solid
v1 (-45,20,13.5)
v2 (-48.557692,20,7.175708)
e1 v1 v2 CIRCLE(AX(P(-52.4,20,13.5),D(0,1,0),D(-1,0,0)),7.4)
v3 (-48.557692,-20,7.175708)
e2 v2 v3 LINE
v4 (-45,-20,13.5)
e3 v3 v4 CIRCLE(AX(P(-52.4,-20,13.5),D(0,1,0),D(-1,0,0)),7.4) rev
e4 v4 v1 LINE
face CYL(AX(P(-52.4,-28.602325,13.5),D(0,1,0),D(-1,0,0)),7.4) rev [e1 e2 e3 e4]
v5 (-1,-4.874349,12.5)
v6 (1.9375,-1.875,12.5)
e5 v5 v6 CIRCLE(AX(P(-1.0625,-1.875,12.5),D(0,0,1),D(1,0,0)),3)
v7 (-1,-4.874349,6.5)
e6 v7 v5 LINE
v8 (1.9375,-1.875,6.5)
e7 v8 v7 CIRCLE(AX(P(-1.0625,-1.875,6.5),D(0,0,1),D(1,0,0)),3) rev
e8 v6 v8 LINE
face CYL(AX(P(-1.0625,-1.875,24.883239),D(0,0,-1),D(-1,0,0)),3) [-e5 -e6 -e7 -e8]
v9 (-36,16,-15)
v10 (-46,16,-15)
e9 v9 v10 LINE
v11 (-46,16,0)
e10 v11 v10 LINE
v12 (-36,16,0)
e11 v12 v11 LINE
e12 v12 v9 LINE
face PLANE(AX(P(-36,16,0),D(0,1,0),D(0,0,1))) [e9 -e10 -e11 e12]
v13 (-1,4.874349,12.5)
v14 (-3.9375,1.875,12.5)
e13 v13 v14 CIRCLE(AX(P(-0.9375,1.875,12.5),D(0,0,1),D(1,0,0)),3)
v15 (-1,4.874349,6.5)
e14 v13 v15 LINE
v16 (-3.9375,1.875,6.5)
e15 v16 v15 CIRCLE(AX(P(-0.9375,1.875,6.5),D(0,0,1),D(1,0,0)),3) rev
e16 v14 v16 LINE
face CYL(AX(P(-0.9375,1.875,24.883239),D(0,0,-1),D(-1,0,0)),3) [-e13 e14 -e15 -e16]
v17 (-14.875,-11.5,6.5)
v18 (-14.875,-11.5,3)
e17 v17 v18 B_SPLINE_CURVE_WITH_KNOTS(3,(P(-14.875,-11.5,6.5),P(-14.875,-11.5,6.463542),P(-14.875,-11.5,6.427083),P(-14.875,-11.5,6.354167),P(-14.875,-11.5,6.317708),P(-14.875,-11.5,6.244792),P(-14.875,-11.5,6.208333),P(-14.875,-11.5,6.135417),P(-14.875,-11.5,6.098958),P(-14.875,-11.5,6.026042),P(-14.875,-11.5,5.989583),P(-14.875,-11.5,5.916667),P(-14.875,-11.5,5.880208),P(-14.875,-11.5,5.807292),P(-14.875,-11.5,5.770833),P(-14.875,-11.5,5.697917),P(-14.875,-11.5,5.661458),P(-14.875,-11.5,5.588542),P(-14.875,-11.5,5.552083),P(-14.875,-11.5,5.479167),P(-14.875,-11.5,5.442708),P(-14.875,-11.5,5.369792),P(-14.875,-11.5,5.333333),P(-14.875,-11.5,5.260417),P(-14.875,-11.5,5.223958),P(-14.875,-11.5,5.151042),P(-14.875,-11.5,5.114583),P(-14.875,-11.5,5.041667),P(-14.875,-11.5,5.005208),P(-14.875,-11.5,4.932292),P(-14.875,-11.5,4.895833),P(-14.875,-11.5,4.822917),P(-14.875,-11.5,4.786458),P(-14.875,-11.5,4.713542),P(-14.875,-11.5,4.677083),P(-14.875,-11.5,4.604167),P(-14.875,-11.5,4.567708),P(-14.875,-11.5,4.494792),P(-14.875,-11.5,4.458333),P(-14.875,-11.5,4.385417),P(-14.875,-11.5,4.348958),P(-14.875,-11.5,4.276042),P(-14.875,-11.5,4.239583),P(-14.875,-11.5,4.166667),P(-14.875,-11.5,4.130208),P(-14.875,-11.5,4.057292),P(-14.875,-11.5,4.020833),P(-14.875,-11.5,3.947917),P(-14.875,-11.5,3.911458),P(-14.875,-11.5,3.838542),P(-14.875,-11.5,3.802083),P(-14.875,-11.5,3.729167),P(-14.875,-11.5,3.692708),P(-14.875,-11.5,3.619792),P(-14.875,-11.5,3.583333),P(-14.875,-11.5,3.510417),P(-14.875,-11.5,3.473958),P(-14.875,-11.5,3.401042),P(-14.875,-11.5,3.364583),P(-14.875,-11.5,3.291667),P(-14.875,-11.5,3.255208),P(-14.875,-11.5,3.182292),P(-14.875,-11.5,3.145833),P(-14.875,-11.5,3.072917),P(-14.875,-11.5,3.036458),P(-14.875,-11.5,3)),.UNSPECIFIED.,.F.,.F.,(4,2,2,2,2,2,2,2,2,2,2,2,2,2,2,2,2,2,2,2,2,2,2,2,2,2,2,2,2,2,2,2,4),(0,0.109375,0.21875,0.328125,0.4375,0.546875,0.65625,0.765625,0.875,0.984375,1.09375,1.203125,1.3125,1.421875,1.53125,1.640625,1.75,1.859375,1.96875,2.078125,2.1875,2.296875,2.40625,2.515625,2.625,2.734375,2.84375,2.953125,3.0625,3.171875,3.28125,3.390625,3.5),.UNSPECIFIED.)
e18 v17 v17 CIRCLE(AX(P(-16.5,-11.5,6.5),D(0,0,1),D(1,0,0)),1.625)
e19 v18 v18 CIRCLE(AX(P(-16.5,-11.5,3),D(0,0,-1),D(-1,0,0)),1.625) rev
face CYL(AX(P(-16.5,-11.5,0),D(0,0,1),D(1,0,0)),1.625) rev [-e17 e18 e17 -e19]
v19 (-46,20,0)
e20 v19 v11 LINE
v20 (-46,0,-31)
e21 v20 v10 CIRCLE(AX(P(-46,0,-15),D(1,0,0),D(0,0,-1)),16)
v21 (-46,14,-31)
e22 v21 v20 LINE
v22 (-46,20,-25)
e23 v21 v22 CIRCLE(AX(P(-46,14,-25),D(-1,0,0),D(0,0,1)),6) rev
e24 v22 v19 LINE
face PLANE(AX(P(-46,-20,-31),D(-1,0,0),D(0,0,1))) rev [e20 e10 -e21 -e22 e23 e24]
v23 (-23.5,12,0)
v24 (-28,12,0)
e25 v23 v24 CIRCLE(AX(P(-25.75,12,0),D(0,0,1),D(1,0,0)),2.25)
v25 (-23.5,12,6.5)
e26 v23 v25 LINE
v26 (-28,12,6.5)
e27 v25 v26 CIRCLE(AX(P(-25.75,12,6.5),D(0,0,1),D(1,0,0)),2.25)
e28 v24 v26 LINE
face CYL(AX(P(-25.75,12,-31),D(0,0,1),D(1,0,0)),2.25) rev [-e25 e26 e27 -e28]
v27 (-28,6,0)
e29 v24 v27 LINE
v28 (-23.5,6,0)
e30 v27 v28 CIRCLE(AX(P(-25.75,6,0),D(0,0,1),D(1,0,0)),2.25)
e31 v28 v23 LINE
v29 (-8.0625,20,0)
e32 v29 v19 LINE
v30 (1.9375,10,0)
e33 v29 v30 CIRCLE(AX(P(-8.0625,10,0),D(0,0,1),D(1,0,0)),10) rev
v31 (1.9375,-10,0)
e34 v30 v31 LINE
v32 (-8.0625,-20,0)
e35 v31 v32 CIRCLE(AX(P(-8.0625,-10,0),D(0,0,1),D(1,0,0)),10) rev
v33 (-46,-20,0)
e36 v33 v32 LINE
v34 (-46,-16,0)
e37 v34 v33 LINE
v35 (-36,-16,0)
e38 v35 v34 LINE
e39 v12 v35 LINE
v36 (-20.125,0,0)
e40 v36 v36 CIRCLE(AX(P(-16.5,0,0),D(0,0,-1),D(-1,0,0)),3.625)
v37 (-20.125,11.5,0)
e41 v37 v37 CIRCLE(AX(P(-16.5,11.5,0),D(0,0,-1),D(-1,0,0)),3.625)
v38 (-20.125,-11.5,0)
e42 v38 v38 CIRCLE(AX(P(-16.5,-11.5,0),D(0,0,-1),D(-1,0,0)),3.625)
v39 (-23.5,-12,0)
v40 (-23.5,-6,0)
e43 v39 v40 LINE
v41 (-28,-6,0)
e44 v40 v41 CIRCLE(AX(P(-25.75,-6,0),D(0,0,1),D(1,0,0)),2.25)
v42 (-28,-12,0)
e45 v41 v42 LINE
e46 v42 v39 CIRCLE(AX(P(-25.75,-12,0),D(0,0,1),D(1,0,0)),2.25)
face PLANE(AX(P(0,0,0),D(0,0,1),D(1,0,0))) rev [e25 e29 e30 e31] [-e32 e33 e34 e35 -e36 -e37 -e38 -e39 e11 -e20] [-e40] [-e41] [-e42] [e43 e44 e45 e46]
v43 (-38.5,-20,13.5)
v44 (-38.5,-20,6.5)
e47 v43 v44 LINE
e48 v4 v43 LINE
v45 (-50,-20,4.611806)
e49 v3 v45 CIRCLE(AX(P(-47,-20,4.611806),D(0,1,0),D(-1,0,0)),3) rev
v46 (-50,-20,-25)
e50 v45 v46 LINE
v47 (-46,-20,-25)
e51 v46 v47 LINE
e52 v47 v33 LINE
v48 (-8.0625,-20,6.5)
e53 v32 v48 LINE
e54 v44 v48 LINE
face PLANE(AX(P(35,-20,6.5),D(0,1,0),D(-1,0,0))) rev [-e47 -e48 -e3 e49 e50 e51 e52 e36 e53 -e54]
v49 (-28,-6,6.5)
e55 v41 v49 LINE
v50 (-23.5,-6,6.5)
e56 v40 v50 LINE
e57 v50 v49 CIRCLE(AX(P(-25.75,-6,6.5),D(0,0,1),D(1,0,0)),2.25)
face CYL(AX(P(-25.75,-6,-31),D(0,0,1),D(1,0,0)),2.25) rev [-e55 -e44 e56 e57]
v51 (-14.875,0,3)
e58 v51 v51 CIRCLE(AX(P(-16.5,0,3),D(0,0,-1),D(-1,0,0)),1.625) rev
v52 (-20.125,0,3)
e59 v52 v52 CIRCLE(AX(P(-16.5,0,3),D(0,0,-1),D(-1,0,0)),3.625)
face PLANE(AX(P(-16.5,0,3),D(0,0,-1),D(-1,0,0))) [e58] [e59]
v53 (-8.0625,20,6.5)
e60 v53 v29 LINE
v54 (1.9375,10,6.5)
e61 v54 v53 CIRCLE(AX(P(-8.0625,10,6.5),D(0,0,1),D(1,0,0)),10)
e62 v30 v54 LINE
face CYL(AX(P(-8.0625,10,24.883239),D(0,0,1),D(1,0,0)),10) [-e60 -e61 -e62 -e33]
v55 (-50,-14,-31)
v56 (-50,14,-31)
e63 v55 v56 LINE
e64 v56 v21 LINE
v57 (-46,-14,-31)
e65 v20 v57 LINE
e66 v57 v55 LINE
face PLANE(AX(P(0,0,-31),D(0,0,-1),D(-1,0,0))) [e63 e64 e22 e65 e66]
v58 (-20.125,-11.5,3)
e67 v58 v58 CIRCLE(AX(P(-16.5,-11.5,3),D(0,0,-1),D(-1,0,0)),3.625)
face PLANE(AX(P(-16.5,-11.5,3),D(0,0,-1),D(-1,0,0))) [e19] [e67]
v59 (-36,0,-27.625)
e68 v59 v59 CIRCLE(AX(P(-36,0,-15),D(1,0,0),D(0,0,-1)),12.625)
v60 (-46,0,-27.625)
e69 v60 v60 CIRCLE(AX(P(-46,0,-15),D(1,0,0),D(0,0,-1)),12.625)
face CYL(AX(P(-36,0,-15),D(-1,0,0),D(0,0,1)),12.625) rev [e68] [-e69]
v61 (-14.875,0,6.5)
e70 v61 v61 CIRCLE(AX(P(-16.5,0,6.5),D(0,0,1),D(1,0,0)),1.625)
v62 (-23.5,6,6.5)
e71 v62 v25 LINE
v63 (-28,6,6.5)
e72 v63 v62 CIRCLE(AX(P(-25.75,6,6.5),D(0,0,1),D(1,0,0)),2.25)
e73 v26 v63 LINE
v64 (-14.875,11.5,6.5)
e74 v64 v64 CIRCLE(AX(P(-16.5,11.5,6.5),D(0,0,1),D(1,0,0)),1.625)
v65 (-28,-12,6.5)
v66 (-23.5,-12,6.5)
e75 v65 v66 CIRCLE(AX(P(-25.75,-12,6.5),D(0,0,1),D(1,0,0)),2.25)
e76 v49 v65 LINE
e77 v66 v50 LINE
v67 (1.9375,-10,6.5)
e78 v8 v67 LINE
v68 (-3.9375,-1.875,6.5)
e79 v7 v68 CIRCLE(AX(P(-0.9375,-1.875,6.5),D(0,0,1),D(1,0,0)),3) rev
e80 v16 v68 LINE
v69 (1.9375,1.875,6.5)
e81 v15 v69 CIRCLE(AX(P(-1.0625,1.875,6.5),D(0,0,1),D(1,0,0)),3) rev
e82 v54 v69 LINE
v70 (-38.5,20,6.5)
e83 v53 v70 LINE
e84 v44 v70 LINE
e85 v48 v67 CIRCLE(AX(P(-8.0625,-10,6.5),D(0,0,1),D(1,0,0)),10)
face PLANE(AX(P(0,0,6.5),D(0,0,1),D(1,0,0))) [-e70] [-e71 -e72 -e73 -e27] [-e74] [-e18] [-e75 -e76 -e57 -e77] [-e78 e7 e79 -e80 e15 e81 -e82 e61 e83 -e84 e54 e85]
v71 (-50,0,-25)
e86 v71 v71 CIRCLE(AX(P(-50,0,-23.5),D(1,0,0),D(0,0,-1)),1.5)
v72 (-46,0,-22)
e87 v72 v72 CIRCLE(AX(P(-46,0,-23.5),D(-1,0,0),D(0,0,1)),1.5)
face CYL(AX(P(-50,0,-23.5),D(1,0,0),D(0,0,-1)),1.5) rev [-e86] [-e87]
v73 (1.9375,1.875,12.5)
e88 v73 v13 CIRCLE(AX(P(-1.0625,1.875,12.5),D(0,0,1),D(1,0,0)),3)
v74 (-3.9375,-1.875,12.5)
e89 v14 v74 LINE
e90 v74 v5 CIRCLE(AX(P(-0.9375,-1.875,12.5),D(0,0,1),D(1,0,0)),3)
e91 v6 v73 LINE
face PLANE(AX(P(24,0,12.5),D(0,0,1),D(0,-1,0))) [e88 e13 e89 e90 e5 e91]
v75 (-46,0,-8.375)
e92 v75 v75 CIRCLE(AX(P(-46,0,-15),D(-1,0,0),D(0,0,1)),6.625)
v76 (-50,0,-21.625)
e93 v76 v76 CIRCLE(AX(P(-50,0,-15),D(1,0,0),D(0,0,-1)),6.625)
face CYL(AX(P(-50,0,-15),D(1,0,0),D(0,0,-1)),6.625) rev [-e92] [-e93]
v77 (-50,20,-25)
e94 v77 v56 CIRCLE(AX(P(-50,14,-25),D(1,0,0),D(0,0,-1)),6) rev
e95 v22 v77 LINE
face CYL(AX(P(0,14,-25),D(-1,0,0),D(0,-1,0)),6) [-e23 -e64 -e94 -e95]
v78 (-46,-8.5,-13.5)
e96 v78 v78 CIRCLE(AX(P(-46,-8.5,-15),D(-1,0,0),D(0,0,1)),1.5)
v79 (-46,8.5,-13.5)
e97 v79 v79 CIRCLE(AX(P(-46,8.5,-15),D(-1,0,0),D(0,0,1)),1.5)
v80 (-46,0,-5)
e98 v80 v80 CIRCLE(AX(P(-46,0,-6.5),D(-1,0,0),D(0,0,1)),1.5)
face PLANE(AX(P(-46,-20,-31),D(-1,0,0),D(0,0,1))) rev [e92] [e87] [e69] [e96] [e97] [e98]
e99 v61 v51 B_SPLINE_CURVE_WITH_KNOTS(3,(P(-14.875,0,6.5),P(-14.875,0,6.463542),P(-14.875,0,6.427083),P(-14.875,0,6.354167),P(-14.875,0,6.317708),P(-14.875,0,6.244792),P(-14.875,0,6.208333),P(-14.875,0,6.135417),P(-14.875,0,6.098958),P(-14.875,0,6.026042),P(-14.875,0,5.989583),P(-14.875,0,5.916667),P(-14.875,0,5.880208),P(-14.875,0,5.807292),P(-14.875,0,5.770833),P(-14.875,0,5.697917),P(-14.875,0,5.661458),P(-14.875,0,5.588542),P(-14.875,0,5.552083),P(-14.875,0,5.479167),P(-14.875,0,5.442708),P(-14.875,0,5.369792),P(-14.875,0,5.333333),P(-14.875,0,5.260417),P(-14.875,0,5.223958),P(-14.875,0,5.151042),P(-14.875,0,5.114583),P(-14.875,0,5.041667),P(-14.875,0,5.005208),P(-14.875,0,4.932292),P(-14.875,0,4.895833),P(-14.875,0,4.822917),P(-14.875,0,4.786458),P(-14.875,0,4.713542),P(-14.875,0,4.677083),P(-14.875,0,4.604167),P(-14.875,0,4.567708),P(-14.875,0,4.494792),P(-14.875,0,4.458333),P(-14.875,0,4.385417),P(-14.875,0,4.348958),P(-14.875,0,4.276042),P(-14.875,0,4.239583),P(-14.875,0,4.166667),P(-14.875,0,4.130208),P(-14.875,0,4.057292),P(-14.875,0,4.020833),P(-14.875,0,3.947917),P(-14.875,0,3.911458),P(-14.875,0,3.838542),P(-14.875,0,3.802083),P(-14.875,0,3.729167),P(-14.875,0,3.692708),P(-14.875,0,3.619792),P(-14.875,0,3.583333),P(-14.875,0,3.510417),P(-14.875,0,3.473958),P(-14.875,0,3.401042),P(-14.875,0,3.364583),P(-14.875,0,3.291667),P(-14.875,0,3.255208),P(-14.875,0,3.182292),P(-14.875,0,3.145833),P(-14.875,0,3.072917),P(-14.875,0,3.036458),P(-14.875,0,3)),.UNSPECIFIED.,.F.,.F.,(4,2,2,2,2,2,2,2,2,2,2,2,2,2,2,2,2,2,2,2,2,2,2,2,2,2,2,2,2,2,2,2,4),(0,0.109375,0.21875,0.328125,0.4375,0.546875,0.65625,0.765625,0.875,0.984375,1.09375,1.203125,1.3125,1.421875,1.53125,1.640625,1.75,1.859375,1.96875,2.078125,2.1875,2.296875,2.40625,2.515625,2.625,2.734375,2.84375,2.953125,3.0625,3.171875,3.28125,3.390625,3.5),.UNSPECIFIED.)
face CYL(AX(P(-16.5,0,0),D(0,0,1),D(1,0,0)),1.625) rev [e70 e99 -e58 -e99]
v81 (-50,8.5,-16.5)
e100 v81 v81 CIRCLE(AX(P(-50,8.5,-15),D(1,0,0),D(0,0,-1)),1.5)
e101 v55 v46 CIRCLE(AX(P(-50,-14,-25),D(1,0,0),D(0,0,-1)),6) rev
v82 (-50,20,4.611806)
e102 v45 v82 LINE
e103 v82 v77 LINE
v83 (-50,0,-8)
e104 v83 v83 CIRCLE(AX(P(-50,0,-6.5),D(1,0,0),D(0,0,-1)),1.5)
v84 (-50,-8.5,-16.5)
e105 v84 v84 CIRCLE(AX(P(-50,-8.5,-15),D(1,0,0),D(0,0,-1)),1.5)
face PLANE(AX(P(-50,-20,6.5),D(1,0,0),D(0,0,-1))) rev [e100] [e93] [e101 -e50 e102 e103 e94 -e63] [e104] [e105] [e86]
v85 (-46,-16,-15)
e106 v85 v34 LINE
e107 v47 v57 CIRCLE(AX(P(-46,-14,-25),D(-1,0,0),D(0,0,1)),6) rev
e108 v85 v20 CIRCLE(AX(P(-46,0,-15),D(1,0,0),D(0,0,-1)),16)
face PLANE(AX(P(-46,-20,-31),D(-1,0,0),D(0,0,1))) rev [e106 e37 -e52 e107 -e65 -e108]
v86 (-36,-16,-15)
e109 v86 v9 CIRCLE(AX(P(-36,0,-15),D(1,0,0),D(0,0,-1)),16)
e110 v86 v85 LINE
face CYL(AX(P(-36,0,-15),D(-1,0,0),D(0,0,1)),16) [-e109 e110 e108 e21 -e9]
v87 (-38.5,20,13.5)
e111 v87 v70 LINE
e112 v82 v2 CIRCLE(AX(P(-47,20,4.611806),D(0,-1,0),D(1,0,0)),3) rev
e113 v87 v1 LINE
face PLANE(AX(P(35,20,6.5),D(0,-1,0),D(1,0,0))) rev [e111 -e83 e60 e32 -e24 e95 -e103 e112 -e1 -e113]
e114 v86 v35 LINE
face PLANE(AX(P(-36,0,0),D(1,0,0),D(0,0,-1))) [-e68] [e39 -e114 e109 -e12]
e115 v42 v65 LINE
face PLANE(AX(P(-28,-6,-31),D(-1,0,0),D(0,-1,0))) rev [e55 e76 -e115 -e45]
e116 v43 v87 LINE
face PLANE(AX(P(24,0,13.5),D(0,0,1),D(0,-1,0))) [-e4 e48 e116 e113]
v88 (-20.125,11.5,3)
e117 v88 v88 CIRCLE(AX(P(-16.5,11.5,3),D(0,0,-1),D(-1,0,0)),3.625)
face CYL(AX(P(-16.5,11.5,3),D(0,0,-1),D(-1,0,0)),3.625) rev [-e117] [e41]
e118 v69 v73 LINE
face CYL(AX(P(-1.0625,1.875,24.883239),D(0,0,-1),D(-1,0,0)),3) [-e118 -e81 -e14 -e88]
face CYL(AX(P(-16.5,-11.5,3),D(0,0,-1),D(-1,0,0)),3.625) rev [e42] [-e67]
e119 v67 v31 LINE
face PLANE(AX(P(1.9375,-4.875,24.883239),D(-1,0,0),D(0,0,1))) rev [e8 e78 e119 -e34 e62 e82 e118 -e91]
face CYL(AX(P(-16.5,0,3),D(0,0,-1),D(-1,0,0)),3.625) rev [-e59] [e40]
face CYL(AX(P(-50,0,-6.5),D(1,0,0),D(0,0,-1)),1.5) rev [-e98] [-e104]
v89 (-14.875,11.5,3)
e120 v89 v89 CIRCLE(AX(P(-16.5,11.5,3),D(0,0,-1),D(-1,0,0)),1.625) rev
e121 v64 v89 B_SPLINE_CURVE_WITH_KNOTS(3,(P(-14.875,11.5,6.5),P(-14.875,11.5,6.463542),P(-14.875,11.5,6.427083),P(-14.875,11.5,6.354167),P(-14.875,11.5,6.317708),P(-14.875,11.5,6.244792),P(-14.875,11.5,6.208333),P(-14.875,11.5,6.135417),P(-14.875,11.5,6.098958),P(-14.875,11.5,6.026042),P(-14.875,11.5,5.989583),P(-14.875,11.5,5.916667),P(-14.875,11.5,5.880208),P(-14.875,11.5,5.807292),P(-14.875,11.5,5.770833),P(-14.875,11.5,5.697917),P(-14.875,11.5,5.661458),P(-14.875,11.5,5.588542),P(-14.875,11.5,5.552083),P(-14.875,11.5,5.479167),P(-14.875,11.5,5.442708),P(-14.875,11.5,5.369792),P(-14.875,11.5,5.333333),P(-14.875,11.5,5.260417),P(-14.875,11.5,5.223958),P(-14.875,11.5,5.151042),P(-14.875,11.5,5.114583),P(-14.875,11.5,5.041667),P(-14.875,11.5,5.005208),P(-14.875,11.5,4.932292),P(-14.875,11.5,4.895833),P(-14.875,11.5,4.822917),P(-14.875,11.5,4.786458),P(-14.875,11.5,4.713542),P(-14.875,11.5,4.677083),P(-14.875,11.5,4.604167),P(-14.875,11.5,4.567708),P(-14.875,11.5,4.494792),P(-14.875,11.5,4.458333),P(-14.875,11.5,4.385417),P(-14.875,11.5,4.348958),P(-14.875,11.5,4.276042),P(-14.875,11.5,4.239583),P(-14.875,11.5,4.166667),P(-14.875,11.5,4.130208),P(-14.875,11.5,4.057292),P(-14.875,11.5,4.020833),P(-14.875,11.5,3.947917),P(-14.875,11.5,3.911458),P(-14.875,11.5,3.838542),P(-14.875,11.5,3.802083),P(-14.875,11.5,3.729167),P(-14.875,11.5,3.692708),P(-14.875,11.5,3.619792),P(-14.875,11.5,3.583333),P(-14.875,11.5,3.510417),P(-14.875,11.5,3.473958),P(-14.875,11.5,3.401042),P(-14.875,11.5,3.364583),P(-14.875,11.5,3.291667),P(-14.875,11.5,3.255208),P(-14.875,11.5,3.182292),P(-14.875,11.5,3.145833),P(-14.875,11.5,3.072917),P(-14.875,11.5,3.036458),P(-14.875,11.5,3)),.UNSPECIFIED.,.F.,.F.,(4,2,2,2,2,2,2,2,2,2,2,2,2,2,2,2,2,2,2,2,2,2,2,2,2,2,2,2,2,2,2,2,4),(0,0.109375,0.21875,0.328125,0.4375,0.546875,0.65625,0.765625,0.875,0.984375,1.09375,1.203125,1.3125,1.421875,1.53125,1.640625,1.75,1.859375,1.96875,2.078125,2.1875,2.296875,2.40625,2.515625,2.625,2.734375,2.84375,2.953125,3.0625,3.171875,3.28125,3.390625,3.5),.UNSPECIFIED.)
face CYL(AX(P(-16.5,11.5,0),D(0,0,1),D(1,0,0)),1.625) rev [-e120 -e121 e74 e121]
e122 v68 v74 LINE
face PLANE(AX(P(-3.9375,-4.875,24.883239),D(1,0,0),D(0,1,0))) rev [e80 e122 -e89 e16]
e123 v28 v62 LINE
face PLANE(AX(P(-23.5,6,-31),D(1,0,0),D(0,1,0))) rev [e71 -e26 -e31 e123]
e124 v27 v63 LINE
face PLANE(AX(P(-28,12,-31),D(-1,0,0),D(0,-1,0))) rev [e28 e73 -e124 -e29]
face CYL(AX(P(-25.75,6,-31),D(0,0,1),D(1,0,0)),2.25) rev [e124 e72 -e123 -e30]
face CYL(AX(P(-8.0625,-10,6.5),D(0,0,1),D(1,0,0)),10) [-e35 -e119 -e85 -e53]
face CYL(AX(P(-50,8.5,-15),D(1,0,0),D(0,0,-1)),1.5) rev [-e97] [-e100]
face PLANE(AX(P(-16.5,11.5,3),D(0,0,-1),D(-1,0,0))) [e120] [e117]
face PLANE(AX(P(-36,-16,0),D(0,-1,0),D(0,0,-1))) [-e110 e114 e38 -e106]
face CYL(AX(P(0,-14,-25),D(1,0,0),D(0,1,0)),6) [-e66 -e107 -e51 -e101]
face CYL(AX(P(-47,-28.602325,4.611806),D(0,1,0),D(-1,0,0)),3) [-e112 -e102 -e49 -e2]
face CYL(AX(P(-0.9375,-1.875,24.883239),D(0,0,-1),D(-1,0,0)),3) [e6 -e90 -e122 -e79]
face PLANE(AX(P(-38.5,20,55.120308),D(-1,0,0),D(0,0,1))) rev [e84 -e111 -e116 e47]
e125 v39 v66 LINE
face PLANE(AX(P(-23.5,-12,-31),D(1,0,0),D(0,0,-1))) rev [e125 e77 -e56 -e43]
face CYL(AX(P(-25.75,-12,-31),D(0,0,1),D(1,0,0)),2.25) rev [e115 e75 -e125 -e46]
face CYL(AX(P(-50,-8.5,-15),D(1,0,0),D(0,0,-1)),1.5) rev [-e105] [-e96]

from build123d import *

# Parameters (mm, degrees)
ESBO_O1_W                  = 85
ESBO_O1_H                  = 40
RESSALTO_EXTRUS_O1_DEPTH   = 6.5
ESBO_O2_W                  = 11.5
ESBO_O2_H                  = 40
RESSALTO_EXTRUS_O2_DEPTH   = 7
CORTE_EXTRUS_O1_DEPTH      = 55.30469593
CORTE_EXTRUS_O1_DEPTH_BACK = 55.30469593
ESBO_O3_R                  = 1.625
ESBO_O6_R                  = 3.625
CORTE_EXTRUS_O3_DEPTH      = 3
ESBO_O7_W                  = 4
ESBO_O7_H                  = 40
RESSALTO_EXTRUS_O4_DEPTH   = 31
ESBO_O8_R                  = 12.625
RESSALTO_EXTRUS_O8_DEPTH   = 10
CORTE_EXTRUS_O4_DEPTH      = 90.0056178
CORTE_EXTRUS_O4_DEPTH_BACK = 90.0056178
ESBO_O10_R                 = 6.625
ESBO_O10_R_2               = 1.5
FILETE1_R                  = 6
CORTE_EXTRUS_O5_DEPTH      = 40
FILETE3_R                  = 3
CORTE_EXTRUS_O7_DEPTH      = 66.622023742
CORTE_EXTRUS_O7_DEPTH_BACK = 66.622023742
ESBO_O14_W                 = 5.875
ESBO_O14_H                 = 9.75
RESSALTO_EXTRUS_O9_DEPTH   = 6
FILETE4_R                  = 3
CORTE_EXTRUS_O8_DEPTH      = 66.622023742
CORTE_EXTRUS_O8_DEPTH_BACK = 66.622023742
ESBO_O15_W                 = 33.0625
ESBO_O15_H                 = 40
FILETE5_R                  = 10


with BuildPart() as part:
    # Esboço1 → Ressalto-extrusão1 (new body)
    with BuildSketch(Plane.XY):
        with Locations((-7.5, 0)):
            Rectangle(ESBO_O1_W, ESBO_O1_H)
    extrude(amount=RESSALTO_EXTRUS_O1_DEPTH)

    # Esboço2 → Ressalto-extrusão2 (add)
    with BuildSketch(Plane.XY.offset(6.5)):
        with Locations((-44.25, 0)):
            Rectangle(ESBO_O2_W, ESBO_O2_H)
    extrude(amount=RESSALTO_EXTRUS_O2_DEPTH)

    # Esboço3 → Corte-extrusão1 (cut, two sides: drawn at the far end of the back side and taken through both)
    with BuildSketch(Plane.XY.offset(6.5).offset(-CORTE_EXTRUS_O1_DEPTH_BACK)):
        with Locations((-16.5, -11.5)):
            Circle(ESBO_O3_R)
        with Locations((-16.5, 0)):
            Circle(ESBO_O3_R)
        with Locations((-16.5, 11.5)):
            Circle(ESBO_O3_R)
    extrude(amount=CORTE_EXTRUS_O1_DEPTH + CORTE_EXTRUS_O1_DEPTH_BACK, mode=Mode.SUBTRACT)

    # Esboço6 → Corte-extrusão3 (cut)
    with BuildSketch(Plane(origin=(0, 0, 0), x_dir=(-1, 0, 0), z_dir=(0, 0, -1))):
        with Locations((16.5, -11.5)):
            Circle(ESBO_O6_R)
        with Locations((16.5, 0)):
            Circle(ESBO_O6_R)
        with Locations((16.5, 11.5)):
            Circle(ESBO_O6_R)
    extrude(amount=-CORTE_EXTRUS_O3_DEPTH, mode=Mode.SUBTRACT)

    # Esboço7 → Ressalto-extrusão4 (add)
    with BuildSketch(Plane(origin=(0, 0, 0), x_dir=(-1, 0, 0), z_dir=(0, 0, -1))):
        with Locations((48, 0)):
            Rectangle(ESBO_O7_W, ESBO_O7_H)
    extrude(amount=RESSALTO_EXTRUS_O4_DEPTH)

    # Esboço8 → Ressalto-extrusão8 (add)
    with BuildSketch(Plane(origin=(-46, 0, 0), x_dir=(0, 0, -1), z_dir=(1, 0, 0))):
        with BuildLine():
            Line((15, -16), (0, -16))
            Line((0, -16), (0, 16))
            Line((0, 16), (15, 16))
            ThreePointArc((15, 16), (31, 0), (15, -16))
        make_face()
        with Locations((15, 0)):
            Circle(ESBO_O8_R, mode=Mode.SUBTRACT)
    extrude(amount=RESSALTO_EXTRUS_O8_DEPTH)

    # Esboço10 → Corte-extrusão4 (cut, two sides: drawn at the far end of the back side and taken through both)
    with BuildSketch(Plane(origin=(-46, 0, 0), x_dir=(0, 0, -1), z_dir=(1, 0, 0)).offset(-CORTE_EXTRUS_O4_DEPTH_BACK)):
        with Locations((15, 0)):
            Circle(ESBO_O10_R)
        with Locations((15, -8.5)):
            Circle(ESBO_O10_R_2)
        with Locations((6.5, 0)):
            Circle(ESBO_O10_R_2)
        with Locations((15, 8.5)):
            Circle(ESBO_O10_R_2)
        with Locations((23.5, 0)):
            Circle(ESBO_O10_R_2)
    extrude(amount=CORTE_EXTRUS_O4_DEPTH + CORTE_EXTRUS_O4_DEPTH_BACK, mode=Mode.SUBTRACT)

    # Filete1
    filete1_edges = [part.edges().sort_by_distance(p)[0] for p in [
        (-48, 20, -31),
        (-48, -20, -31),
    ]]
    fillet(filete1_edges, radius=FILETE1_R)

    # Esboço11 → Corte-extrusão5 (cut)
    with BuildSketch(Plane(origin=(0, 20, 0), x_dir=(1, 0, 0), z_dir=(0, 1, 0))):
        with BuildLine():
            Line((-50, -6.5), (-50, -13.5))
            Line((-50, -13.5), (-45, -13.5))
            ThreePointArc((-45, -13.5), (-46.378372313, -9.198837366), (-50, -6.5))
        make_face()
    extrude(amount=-CORTE_EXTRUS_O5_DEPTH, mode=Mode.SUBTRACT)

    # Filete3
    filete3_edges = [part.edges().sort_by_distance(p)[0] for p in [
        (-50, 0, 6.5),
    ]]
    fillet(filete3_edges, radius=FILETE3_R)

    # Esboço13 → Corte-extrusão7 (cut, two sides: drawn at the far end of the back side and taken through both)
    with BuildSketch(Plane.XY.offset(6.5).offset(-CORTE_EXTRUS_O7_DEPTH_BACK)):
        with BuildLine():
            Line((-28, -6), (-28, -12))
            ThreePointArc((-28, -12), (-25.75, -14.25), (-23.5, -12))
            Line((-23.5, -12), (-23.5, -6))
            ThreePointArc((-23.5, -6), (-25.75, -3.75), (-28, -6))
        make_face()
        with BuildLine():
            Line((-23.5, 6), (-23.5, 12))
            ThreePointArc((-23.5, 12), (-25.75, 14.25), (-28, 12))
            Line((-28, 12), (-28, 6))
            ThreePointArc((-28, 6), (-25.75, 3.75), (-23.5, 6))
        make_face()
    extrude(amount=CORTE_EXTRUS_O7_DEPTH + CORTE_EXTRUS_O7_DEPTH_BACK, mode=Mode.SUBTRACT)

    # Esboço14 → Ressalto-extrusão9 (add)
    with BuildSketch(Plane.XY.offset(6.5)):
        with Locations((-1, 0)):
            Rectangle(ESBO_O14_W, ESBO_O14_H)
    extrude(amount=RESSALTO_EXTRUS_O9_DEPTH)

    # Filete4
    # the kernel refuses this fillet: 3 mm, written as the material it takes off along each edge
    with BuildSketch(Plane(origin=(-3.9375, 4.875, 6.5), x_dir=(0, -1, 0), z_dir=(0, 0, 1)), Plane(origin=(-3.9375, -4.875, 6.5), x_dir=(1, 0, 0), z_dir=(0, 0, 1)), Plane(origin=(1.9375, 4.875, 6.5), x_dir=(-1, 0, 0), z_dir=(0, 0, 1))) as filete4_piece_1:
        with BuildLine():
            CenterArc((FILETE4_R, FILETE4_R), FILETE4_R, 180, 90)
            Line((0, FILETE4_R), (0, 0))
            Line((0, 0), (FILETE4_R, 0))
        make_face()
    extrude(amount=13.5, mode=Mode.SUBTRACT)
    with BuildSketch(Plane(origin=(1.9375, -4.875, 6.5), x_dir=(-1, 0, 0), z_dir=(0, 0, 1))) as filete4_piece_2:
        with BuildLine():
            CenterArc((FILETE4_R, -FILETE4_R), FILETE4_R, 90, 90)
            Line((0, -FILETE4_R), (0, 0))
            Line((0, 0), (FILETE4_R, 0))
        make_face()
    extrude(amount=13.5, mode=Mode.SUBTRACT)

    # Esboço15 → Corte-extrusão8 (cut, two sides: drawn at the far end of the back side and taken through both)
    with BuildSketch(Plane.XY.offset(6.5).offset(-CORTE_EXTRUS_O8_DEPTH_BACK)):
        with Locations((18.46875, 0)):
            Rectangle(ESBO_O15_W, ESBO_O15_H)
    extrude(amount=CORTE_EXTRUS_O8_DEPTH + CORTE_EXTRUS_O8_DEPTH_BACK, mode=Mode.SUBTRACT)

    # Filete5
    filete5_edges = [part.edges().sort_by_distance(p)[0] for p in [
        (1.9375, 20, 3.25),
        (1.9375, -20, 3.25),
    ]]
    fillet(filete5_edges, radius=FILETE5_R)


solid = part.part
